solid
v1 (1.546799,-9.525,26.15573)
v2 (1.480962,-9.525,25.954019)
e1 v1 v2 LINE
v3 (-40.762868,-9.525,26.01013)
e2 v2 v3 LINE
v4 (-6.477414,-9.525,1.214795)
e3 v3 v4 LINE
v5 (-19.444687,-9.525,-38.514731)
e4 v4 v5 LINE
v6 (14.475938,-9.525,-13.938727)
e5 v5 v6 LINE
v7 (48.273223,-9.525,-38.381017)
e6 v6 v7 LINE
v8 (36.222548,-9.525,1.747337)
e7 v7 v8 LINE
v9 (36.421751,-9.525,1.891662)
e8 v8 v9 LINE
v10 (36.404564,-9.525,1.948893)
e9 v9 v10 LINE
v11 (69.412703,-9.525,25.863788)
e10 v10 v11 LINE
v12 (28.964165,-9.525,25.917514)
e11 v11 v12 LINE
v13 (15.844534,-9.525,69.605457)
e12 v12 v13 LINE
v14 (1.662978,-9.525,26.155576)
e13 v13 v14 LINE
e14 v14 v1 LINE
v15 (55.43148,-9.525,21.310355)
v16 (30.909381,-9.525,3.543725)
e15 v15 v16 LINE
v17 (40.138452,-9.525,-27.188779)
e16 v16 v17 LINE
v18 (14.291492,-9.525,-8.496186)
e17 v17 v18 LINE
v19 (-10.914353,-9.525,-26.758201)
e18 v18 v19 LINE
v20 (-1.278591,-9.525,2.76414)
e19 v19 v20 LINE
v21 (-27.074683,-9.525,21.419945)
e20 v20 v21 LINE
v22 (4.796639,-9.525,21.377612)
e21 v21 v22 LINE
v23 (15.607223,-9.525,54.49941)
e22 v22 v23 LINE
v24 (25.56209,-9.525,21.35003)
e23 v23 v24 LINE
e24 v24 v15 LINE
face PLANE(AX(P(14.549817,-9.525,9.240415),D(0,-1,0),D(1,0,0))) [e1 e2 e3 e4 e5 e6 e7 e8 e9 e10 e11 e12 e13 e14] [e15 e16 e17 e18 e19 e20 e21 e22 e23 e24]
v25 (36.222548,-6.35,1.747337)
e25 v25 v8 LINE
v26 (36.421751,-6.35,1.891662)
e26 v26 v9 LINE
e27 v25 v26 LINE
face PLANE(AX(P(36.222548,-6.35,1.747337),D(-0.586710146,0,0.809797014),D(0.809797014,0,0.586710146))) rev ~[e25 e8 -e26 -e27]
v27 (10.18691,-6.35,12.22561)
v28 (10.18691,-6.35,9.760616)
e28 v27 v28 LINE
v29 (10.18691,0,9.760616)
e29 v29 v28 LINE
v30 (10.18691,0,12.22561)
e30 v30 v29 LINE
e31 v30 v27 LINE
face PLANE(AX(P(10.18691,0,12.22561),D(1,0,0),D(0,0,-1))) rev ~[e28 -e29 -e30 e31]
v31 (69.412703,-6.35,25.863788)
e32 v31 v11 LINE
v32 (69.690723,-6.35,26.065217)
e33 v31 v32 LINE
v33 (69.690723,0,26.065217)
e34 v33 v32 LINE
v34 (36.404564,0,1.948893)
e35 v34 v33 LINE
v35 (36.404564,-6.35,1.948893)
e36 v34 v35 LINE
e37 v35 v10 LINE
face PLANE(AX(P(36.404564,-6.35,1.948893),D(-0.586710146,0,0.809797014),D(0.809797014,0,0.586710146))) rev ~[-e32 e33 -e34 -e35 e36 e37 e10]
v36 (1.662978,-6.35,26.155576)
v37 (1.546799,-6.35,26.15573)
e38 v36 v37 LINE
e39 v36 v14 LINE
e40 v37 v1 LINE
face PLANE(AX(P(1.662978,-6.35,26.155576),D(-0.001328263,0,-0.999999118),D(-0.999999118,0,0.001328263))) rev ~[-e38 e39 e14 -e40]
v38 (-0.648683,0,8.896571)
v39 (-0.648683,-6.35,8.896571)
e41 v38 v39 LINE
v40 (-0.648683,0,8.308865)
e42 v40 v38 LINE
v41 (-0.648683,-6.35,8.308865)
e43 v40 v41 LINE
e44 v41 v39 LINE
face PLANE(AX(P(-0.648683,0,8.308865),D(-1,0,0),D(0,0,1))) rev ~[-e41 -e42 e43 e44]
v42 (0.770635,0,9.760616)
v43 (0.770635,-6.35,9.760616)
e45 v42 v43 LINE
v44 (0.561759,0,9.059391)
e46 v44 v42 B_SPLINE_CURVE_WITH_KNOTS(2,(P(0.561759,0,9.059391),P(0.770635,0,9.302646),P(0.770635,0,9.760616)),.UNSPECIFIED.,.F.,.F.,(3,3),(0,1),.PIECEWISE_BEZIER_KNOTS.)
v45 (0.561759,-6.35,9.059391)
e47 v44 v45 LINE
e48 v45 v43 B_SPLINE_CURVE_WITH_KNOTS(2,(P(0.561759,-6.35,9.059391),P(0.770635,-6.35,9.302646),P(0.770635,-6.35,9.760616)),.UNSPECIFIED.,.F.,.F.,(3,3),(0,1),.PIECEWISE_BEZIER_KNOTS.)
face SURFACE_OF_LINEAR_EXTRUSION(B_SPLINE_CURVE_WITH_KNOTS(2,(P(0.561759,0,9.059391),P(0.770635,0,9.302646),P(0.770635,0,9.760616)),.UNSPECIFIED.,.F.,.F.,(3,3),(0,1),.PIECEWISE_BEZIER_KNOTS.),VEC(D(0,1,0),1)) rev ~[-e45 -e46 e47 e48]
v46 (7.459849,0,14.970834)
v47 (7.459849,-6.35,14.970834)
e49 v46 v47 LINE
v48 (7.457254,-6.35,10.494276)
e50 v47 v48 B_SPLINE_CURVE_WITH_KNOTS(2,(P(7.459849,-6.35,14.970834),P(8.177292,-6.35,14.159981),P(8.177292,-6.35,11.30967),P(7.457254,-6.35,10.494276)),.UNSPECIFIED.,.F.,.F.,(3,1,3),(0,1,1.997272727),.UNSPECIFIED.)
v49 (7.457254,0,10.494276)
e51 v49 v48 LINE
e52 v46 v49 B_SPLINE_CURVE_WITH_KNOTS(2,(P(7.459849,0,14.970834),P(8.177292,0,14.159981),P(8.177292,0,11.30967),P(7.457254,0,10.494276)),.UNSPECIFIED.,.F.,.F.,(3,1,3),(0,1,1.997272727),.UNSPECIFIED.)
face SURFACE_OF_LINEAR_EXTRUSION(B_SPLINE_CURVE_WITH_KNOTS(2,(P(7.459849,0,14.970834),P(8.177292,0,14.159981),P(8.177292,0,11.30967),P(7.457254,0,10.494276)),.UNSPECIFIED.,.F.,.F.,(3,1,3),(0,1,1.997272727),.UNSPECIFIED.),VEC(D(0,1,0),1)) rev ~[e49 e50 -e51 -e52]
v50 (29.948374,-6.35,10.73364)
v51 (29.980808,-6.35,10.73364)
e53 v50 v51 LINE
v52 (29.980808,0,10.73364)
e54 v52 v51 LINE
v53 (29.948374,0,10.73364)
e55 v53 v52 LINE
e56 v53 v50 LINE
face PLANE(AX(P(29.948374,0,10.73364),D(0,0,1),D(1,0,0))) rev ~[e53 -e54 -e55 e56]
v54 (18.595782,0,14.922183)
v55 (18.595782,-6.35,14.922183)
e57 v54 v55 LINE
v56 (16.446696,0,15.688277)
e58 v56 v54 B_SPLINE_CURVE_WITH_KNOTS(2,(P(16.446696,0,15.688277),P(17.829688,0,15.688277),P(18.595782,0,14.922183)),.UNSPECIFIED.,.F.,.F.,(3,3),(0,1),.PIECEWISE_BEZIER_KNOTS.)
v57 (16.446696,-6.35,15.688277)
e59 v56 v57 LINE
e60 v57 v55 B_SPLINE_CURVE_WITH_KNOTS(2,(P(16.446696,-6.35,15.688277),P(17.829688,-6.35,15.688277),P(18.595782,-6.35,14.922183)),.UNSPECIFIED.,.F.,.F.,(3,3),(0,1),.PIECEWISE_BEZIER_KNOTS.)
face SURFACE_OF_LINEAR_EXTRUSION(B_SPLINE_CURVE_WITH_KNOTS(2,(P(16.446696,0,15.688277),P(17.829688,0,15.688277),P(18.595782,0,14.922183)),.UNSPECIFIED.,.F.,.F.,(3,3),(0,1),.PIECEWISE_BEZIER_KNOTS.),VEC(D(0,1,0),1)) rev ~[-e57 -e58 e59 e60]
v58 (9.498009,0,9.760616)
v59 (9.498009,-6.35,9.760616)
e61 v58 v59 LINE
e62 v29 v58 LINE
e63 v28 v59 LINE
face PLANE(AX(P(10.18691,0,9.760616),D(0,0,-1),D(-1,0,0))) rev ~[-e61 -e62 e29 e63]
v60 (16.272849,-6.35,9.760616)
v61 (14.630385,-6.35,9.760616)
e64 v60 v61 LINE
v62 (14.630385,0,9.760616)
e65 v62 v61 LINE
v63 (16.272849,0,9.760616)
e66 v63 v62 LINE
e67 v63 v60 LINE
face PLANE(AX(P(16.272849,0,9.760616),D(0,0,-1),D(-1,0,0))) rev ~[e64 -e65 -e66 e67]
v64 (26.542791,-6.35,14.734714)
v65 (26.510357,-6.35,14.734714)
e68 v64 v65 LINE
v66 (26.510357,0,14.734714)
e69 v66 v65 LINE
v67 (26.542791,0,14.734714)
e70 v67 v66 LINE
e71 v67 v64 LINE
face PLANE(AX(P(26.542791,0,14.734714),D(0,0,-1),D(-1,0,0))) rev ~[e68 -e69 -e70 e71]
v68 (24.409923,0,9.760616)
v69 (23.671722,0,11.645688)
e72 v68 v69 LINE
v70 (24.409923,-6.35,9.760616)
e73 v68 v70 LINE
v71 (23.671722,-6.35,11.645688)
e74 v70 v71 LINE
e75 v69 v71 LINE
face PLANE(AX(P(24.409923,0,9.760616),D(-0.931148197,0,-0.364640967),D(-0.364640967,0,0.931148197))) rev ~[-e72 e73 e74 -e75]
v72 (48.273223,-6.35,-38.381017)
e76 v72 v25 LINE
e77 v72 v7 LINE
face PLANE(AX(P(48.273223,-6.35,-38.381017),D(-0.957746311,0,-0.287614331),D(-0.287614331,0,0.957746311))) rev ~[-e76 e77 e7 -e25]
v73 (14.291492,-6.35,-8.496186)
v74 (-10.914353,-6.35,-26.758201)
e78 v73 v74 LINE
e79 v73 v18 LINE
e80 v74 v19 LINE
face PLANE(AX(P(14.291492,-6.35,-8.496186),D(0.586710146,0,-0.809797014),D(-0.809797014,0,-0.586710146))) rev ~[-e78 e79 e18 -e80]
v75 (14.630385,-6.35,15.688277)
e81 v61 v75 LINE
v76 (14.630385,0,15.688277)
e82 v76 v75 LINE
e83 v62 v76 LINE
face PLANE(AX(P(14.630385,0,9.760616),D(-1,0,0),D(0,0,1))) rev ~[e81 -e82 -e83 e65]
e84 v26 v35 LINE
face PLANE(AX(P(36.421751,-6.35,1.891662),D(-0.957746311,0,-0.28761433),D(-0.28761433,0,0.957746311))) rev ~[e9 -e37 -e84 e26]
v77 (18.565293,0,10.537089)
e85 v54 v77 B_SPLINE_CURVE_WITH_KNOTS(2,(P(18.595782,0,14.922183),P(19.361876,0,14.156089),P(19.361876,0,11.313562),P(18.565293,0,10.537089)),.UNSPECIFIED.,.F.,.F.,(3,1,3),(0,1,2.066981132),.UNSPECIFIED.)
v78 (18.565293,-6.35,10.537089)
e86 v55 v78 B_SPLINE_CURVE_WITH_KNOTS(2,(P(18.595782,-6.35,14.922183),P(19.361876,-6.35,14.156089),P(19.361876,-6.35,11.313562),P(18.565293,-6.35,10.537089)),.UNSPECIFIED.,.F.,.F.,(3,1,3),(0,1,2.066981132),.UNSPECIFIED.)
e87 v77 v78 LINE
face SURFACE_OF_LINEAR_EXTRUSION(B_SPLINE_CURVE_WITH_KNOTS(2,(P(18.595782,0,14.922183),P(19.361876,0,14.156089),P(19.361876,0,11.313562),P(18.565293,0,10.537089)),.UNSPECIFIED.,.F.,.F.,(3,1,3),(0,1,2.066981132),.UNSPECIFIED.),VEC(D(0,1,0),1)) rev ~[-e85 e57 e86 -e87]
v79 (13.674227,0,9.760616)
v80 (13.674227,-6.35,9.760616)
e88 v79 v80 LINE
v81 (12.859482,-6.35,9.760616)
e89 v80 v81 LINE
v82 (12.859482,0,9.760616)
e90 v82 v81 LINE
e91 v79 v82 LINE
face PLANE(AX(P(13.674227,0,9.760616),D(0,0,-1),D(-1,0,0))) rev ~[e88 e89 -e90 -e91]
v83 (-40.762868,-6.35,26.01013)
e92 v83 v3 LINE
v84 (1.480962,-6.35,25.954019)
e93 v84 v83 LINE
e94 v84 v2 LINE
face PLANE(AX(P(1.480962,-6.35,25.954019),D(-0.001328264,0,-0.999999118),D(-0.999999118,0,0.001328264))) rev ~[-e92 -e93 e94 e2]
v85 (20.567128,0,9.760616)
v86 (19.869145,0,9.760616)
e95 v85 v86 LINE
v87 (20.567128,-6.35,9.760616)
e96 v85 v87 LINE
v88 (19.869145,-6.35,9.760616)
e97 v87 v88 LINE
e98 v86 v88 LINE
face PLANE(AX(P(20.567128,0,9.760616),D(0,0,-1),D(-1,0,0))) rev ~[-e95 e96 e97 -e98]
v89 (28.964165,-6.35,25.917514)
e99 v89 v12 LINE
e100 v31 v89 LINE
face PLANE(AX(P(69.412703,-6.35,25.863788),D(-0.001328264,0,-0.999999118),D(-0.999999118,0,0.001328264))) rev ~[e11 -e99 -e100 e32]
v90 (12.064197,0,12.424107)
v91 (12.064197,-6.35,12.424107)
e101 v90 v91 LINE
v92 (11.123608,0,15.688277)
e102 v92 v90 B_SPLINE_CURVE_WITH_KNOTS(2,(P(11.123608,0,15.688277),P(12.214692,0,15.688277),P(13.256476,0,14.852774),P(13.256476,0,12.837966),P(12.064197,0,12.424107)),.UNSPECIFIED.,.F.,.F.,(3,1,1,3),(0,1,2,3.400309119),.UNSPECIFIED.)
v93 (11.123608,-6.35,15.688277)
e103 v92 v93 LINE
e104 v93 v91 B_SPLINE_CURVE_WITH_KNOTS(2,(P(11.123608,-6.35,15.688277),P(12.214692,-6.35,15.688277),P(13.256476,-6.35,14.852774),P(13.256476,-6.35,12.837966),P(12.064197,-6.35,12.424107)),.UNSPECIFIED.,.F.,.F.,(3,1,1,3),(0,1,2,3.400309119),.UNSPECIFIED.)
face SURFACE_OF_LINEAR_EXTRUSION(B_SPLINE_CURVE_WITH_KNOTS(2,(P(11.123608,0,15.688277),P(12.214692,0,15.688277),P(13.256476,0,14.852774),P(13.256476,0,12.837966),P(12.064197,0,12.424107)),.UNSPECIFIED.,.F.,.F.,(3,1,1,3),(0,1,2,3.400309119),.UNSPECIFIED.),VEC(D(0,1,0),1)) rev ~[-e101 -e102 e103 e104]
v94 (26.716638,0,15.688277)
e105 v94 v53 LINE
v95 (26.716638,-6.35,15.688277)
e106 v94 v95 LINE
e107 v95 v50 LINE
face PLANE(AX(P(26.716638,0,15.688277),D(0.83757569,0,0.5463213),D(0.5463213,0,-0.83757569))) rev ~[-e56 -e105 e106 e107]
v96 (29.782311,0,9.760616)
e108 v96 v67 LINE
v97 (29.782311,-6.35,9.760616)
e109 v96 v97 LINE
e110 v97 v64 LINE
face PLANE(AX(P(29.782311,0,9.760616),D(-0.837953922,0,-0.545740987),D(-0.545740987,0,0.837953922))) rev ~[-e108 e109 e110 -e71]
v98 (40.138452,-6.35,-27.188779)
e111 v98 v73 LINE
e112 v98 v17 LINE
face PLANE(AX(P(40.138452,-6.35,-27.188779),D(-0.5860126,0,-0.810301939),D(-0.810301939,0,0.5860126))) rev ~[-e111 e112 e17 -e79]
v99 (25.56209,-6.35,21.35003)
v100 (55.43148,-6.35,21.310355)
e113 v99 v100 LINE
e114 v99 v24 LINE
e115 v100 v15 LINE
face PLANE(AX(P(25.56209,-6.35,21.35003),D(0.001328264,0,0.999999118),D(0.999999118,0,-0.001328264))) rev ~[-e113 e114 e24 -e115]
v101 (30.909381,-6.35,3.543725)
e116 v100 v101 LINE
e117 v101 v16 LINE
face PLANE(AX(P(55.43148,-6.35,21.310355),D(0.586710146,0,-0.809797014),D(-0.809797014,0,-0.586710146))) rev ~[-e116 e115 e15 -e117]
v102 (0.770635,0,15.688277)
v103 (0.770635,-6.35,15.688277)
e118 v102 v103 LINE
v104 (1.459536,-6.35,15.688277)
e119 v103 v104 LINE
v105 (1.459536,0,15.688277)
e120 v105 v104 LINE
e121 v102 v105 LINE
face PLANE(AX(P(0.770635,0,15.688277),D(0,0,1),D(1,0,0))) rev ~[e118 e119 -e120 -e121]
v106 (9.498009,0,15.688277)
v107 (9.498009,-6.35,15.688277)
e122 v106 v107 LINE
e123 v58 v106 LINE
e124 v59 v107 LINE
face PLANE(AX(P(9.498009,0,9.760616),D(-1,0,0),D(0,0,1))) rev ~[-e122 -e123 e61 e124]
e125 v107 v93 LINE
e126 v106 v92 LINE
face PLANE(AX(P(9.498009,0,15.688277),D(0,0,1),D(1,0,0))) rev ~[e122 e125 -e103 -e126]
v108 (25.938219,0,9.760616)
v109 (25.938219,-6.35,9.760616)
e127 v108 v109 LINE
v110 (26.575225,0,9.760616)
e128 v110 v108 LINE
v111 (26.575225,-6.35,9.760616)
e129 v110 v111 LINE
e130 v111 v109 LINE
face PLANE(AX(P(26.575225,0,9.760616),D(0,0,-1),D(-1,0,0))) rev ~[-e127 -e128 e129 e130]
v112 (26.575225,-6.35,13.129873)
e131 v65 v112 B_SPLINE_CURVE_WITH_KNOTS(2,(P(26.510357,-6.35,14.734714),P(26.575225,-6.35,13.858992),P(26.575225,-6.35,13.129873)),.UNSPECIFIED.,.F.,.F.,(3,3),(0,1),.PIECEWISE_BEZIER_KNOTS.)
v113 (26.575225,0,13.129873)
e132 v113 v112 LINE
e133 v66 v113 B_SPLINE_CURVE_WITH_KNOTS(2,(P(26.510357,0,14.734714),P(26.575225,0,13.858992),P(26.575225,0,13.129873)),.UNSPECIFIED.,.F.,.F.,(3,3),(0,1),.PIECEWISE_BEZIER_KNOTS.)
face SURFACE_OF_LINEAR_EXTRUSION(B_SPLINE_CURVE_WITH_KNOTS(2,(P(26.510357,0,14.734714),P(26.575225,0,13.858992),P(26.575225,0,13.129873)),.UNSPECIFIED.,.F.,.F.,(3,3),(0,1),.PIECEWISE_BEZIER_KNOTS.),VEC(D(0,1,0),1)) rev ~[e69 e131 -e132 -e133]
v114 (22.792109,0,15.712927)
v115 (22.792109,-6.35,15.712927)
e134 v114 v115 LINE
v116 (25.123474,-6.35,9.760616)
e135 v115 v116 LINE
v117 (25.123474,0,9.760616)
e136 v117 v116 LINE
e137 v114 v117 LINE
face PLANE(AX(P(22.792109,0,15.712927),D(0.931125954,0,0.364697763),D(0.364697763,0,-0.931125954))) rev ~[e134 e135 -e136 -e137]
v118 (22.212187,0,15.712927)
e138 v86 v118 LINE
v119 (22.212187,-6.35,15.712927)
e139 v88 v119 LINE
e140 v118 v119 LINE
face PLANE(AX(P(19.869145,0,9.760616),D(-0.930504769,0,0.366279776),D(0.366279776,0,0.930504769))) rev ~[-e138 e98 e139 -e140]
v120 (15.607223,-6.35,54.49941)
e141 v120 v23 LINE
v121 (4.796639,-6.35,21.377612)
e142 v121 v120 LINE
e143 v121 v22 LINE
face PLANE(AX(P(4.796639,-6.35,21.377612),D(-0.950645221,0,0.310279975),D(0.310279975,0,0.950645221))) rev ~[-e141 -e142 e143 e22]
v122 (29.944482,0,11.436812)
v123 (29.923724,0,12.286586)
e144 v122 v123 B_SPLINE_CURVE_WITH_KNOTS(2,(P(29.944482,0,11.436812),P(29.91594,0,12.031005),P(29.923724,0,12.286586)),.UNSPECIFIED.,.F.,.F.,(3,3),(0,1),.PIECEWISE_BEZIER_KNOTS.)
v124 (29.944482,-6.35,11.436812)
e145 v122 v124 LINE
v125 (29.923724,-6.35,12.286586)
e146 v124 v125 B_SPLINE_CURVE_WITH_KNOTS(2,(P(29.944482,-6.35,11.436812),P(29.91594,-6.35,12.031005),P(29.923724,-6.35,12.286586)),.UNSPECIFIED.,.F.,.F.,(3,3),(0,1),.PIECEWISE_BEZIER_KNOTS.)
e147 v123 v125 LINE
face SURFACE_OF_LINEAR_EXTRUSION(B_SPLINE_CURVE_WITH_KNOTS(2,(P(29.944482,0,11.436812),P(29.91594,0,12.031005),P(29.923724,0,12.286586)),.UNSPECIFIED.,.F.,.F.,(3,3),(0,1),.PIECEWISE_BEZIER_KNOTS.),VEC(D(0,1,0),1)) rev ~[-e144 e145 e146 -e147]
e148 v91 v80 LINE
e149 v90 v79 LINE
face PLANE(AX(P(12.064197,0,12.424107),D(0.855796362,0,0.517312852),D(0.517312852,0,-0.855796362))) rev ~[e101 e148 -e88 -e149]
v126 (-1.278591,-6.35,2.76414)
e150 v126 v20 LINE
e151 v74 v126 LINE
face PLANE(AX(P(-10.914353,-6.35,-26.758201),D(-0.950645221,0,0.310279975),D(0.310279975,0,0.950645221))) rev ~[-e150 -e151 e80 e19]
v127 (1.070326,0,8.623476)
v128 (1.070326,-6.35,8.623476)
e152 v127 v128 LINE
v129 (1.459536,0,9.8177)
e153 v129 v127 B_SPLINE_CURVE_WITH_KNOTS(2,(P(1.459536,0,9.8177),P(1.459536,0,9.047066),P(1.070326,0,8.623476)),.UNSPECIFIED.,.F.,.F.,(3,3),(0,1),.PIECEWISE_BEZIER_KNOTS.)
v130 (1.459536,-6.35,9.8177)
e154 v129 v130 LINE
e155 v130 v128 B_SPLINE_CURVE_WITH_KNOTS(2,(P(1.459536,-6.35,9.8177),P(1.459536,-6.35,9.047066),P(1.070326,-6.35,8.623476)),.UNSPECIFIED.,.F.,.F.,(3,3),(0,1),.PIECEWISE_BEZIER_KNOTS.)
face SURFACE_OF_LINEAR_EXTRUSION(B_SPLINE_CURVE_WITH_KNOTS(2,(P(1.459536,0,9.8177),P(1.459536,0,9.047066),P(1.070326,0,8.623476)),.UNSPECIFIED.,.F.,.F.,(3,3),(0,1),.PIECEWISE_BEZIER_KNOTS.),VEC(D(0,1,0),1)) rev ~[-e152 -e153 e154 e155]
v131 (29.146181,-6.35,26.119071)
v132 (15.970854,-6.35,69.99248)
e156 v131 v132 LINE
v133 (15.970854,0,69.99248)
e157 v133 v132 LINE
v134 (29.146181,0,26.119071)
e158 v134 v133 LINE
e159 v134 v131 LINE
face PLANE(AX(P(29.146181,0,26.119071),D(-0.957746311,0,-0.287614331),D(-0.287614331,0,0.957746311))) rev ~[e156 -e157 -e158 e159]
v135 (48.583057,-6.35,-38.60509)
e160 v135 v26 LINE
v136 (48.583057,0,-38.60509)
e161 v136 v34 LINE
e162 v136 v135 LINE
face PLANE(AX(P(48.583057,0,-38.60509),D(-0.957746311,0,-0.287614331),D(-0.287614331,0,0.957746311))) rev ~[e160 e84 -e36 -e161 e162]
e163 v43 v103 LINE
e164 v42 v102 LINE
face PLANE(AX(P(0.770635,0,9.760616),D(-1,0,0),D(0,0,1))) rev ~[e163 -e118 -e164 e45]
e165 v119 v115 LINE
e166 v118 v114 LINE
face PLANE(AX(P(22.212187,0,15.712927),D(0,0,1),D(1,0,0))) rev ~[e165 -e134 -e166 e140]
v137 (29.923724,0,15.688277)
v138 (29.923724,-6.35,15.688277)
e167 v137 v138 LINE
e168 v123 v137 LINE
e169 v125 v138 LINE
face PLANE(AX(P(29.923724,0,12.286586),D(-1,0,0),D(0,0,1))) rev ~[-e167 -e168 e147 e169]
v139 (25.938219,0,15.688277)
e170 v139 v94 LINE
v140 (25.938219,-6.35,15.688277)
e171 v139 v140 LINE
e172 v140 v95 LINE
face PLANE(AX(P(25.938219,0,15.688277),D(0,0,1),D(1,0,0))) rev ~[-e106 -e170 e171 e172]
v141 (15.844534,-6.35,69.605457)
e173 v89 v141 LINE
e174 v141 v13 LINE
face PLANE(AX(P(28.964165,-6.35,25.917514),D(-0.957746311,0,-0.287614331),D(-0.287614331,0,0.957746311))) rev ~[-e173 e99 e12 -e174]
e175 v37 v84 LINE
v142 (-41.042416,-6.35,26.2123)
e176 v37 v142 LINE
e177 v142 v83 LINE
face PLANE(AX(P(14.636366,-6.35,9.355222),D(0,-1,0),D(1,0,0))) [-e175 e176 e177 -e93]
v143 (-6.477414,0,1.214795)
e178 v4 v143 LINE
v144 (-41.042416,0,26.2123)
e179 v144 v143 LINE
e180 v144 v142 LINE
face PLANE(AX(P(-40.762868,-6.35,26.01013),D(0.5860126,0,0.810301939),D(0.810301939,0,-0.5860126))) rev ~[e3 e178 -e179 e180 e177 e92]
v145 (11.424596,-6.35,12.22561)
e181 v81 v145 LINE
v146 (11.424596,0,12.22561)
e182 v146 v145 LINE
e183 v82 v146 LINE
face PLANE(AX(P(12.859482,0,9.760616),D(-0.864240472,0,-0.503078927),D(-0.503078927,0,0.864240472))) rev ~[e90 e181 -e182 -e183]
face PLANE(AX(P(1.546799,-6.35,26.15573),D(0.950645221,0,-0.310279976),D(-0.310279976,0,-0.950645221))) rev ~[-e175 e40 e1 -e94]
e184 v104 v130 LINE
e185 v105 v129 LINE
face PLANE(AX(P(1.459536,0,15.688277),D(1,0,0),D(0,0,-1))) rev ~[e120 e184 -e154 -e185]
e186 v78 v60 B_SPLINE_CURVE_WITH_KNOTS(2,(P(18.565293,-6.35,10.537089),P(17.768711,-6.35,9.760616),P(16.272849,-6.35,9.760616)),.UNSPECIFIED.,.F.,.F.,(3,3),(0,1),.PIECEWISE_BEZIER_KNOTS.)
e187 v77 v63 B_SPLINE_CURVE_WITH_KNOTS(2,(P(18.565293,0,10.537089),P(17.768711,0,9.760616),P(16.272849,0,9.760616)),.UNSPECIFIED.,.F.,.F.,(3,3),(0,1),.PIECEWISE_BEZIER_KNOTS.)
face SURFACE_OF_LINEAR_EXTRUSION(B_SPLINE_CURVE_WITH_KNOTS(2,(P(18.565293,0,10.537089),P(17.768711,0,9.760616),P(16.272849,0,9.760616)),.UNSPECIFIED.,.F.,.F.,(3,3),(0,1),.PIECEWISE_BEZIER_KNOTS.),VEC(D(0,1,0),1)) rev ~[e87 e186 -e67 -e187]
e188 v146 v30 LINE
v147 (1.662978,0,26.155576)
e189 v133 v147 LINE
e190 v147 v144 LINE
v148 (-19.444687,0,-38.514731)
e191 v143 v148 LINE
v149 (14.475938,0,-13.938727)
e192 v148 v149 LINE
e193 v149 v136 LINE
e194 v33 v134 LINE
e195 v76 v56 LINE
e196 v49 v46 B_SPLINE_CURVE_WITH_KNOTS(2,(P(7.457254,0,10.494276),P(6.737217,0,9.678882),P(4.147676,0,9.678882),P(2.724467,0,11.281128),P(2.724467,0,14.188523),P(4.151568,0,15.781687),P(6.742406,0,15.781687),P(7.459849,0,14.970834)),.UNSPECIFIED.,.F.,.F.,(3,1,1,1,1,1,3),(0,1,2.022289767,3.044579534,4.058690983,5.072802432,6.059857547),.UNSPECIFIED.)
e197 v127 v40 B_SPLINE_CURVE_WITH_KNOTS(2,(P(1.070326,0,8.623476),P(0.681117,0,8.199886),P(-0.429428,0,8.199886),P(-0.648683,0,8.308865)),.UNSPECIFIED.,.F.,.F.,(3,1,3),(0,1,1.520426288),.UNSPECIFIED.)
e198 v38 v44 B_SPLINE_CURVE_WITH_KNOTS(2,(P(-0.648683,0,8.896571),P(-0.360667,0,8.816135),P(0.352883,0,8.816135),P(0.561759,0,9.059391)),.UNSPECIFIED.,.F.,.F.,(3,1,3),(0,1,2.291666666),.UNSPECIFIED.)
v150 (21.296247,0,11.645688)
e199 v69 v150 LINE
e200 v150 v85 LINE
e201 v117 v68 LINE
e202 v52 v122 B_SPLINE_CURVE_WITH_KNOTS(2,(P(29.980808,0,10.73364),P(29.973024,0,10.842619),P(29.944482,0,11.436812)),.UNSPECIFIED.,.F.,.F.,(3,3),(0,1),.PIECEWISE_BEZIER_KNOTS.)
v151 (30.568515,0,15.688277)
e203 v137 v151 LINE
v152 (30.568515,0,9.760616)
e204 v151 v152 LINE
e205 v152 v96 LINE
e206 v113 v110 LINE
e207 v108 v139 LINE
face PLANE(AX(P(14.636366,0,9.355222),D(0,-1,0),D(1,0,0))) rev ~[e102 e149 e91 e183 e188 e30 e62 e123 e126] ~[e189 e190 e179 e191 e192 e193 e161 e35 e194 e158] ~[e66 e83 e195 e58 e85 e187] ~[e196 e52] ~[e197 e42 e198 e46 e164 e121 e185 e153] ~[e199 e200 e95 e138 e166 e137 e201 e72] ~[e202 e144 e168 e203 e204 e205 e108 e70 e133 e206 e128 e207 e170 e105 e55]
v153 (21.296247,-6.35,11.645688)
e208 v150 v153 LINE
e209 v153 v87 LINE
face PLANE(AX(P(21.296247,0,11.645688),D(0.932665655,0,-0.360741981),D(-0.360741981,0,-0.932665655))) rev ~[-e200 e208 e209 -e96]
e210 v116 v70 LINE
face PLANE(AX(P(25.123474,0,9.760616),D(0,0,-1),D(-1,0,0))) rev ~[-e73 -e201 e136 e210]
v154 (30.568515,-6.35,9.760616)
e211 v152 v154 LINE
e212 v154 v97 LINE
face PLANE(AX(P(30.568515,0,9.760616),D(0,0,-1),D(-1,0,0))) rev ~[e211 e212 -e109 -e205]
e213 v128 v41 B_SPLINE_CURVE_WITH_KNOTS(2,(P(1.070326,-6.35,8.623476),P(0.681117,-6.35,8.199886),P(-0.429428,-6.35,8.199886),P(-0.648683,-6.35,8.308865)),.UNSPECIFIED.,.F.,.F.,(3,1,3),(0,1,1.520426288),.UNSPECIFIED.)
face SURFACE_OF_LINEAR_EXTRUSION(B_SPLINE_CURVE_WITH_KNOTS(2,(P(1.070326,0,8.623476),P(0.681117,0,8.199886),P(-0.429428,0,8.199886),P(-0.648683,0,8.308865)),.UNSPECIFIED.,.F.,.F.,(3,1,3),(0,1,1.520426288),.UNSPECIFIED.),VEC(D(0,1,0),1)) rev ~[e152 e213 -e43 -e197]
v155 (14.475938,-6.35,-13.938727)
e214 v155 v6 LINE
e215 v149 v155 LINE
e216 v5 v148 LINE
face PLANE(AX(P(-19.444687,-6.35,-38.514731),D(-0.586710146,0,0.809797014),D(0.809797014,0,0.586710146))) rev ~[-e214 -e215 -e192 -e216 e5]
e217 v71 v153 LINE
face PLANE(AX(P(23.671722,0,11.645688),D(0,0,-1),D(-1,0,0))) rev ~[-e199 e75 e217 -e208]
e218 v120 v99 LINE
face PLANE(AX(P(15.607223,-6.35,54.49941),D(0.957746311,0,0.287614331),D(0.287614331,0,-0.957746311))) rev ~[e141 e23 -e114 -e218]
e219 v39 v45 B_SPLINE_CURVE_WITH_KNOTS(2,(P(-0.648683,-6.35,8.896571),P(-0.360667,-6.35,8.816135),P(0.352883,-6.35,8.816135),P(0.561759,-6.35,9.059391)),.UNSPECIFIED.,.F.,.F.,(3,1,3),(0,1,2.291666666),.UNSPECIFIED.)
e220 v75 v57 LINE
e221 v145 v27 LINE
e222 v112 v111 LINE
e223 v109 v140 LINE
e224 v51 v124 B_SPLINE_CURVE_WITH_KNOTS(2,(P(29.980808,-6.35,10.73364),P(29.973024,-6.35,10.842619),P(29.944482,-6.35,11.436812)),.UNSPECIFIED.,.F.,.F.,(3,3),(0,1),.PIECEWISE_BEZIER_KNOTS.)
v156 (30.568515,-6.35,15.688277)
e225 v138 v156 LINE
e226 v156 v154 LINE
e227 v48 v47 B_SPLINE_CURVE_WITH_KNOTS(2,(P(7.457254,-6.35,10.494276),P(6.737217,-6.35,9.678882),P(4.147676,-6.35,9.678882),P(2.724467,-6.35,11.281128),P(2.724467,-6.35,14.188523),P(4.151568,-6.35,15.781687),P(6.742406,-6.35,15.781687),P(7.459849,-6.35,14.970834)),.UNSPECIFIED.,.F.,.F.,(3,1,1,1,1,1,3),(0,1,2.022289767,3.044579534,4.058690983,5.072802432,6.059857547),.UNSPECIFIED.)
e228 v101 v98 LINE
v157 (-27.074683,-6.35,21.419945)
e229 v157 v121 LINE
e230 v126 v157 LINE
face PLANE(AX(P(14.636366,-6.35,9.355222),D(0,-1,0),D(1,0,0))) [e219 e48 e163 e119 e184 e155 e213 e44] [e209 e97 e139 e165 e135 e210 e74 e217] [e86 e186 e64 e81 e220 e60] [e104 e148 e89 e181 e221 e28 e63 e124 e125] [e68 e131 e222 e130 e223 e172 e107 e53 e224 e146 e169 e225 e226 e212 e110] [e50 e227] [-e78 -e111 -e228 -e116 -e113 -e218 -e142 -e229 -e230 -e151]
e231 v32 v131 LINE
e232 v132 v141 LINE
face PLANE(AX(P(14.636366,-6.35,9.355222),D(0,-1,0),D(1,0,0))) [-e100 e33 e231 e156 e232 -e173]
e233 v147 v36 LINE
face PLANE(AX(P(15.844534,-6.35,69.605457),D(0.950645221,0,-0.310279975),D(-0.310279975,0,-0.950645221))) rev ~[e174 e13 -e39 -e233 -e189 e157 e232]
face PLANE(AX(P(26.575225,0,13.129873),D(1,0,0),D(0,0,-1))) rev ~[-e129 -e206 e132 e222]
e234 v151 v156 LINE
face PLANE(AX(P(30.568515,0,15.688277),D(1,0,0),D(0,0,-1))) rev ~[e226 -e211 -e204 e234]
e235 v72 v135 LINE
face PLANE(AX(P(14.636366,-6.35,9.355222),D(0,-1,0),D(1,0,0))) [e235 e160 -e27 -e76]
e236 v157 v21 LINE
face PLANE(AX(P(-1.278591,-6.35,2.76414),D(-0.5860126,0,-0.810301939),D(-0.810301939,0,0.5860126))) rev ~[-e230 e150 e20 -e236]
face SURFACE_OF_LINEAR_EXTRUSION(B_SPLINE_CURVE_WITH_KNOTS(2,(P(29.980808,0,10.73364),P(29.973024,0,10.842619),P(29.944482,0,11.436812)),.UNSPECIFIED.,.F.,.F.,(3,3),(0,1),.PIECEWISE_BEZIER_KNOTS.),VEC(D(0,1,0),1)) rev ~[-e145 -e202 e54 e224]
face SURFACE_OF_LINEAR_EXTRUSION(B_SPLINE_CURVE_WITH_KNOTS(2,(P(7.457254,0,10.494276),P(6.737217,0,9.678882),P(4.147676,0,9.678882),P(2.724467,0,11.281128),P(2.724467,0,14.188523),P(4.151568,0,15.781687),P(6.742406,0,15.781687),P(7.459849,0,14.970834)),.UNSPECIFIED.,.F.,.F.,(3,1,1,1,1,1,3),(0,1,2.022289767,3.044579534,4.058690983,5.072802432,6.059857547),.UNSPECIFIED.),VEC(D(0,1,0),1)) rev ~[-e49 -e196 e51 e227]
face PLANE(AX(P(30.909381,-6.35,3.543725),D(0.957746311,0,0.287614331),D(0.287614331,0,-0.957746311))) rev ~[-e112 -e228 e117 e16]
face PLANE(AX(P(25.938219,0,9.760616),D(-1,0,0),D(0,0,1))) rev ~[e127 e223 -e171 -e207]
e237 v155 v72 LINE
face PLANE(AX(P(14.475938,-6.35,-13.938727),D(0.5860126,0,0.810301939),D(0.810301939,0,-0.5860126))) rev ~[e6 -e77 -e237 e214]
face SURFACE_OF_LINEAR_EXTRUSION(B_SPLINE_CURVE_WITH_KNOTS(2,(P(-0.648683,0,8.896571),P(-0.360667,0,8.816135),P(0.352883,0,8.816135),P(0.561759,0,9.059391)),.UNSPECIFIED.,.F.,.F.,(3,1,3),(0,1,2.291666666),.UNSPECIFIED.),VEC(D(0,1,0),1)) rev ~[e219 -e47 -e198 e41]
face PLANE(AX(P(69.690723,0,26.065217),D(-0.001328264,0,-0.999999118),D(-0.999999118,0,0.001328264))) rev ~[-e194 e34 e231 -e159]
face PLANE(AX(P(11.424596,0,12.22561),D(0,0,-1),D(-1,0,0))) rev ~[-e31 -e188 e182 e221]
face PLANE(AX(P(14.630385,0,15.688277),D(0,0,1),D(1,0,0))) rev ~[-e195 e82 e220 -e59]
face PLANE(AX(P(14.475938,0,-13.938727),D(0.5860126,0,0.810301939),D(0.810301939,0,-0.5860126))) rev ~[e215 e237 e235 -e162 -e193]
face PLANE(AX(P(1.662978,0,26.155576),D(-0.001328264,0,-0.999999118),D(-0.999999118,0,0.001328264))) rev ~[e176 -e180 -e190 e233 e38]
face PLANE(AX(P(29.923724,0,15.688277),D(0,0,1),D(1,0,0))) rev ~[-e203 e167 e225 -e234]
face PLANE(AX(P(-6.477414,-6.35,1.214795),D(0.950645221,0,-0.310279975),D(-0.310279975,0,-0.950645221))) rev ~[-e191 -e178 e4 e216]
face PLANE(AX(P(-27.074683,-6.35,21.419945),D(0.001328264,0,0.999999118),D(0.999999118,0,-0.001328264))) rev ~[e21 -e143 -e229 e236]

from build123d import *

# Parameters (mm, degrees)
F1_DEPTH = 6.35
F3_DEPTH = 3.175


with BuildPart() as f1:
    # F0 (on Front) → F1 (new body)
    with BuildSketch(Plane.XZ):
        Polygon((36.4045640823, 1.9488933967), (69.6907226001, 26.065217087), (29.1461811696, 26.1190709712), (15.9708538221, 69.9924798862), (1.6629783111, 26.15557594), (-41.0424164863, 26.2123000095), (-6.4774139305, 1.2147947246), (-19.4446871391, -38.5147311336), (14.4759376997, -13.9387270281), (48.5830571498, -38.6050899867), align=None)
        with BuildLine():
            add(Edge.make_bspline(
                [(1.0703261445, 8.6234759039), (0.6811166374, 8.1998862237), (-0.0492998709, 8.1998862237)],
                knots=[0, 0, 0, 1, 1, 1], degree=2))
            add(Edge.make_bspline(
                [(-0.0492998709, 8.1998862237), (-0.4294278228, 8.1998862237), (-0.6486825118, 8.3088648857)],
                knots=[0, 0, 0, 1, 1, 1], degree=2))
            Line((-0.6486825118, 8.3088648857), (-0.6486825118, 8.8965712414))
            add(Edge.make_bspline(
                [(-0.6486825118, 8.8965712414), (-0.3606674766, 8.81613461), (-0.0492998709, 8.81613461)],
                knots=[0, 0, 0, 1, 1, 1], degree=2))
            add(Edge.make_bspline(
                [(-0.0492998709, 8.81613461), (0.3528832864, 8.81613461), (0.5617590552, 9.0593905519)],
                knots=[0, 0, 0, 1, 1, 1], degree=2))
            add(Edge.make_bspline(
                [(0.5617590552, 9.0593905519), (0.7706348241, 9.3026464938), (0.7706348241, 9.7606163472)],
                knots=[0, 0, 0, 1, 1, 1], degree=2))
            Line((0.7706348241, 9.7606163472), (0.7706348241, 15.6882771403))
            Line((0.7706348241, 15.6882771403), (1.4595356516, 15.6882771403))
            Line((1.4595356516, 15.6882771403), (1.4595356516, 9.8177004082))
            add(Edge.make_bspline(
                [(1.4595356516, 9.8177004082), (1.4595356516, 9.0470655842), (1.0703261445, 8.6234759039)],
                knots=[0, 0, 0, 1, 1, 1], degree=2))
        make_face(mode=Mode.SUBTRACT)
        with BuildLine():
            add(Edge.make_bspline(
                [(7.4598488861, 14.9708342823), (8.1772917442, 14.1599811425), (8.1772917442, 12.7328796164)],
                knots=[0, 0, 0, 1, 1, 1], degree=2))
            add(Edge.make_bspline(
                [(8.1772917442, 12.7328796164), (8.1772917442, 11.3096701855), (7.4572541561, 10.4942762681)],
                knots=[0, 0, 0, 1, 1, 1], degree=2))
            add(Edge.make_bspline(
                [(7.4572541561, 10.4942762681), (6.7372165679, 9.6788823507), (5.4567172896, 9.6788823507)],
                knots=[0, 0, 0, 1, 1, 1], degree=2))
            add(Edge.make_bspline(
                [(5.4567172896, 9.6788823507), (4.1476759807, 9.6788823507), (3.4360712652, 10.4800052528)],
                knots=[0, 0, 0, 1, 1, 1], degree=2))
            add(Edge.make_bspline(
                [(3.4360712652, 10.4800052528), (2.7244665497, 11.2811281549), (2.7244665497, 12.7406638066)],
                knots=[0, 0, 0, 1, 1, 1], degree=2))
            add(Edge.make_bspline(
                [(2.7244665497, 12.7406638066), (2.7244665497, 14.188523173), (3.4380173127, 14.9851052975)],
                knots=[0, 0, 0, 1, 1, 1], degree=2))
            add(Edge.make_bspline(
                [(3.4380173127, 14.9851052975), (4.1515680757, 15.781687422), (5.4645014797, 15.781687422)],
                knots=[0, 0, 0, 1, 1, 1], degree=2))
            add(Edge.make_bspline(
                [(5.4645014797, 15.781687422), (6.742406028, 15.781687422), (7.4598488861, 14.9708342823)],
                knots=[0, 0, 0, 1, 1, 1], degree=2))
        make_face(mode=Mode.SUBTRACT)
        with BuildLine():
            Line((11.4245963984, 12.2256098922), (10.1869101659, 12.2256098922))
            Line((10.1869101659, 12.2256098922), (10.1869101659, 9.7606163472))
            Line((10.1869101659, 9.7606163472), (9.4980093383, 9.7606163472))
            Line((9.4980093383, 9.7606163472), (9.4980093383, 15.6882771403))
            Line((9.4980093383, 15.6882771403), (11.1236077129, 15.6882771403))
            add(Edge.make_bspline(
                [(11.1236077129, 15.6882771403), (12.2146916979, 15.6882771403), (12.7355837549, 15.2705256027)],
                knots=[0, 0, 0, 1, 1, 1], degree=2))
            add(Edge.make_bspline(
                [(12.7355837549, 15.2705256027), (13.2564758119, 14.8527740651), (13.2564758119, 14.0133788948)],
                knots=[0, 0, 0, 1, 1, 1], degree=2))
            add(Edge.make_bspline(
                [(13.2564758119, 14.0133788948), (13.2564758119, 12.8379661833), (12.0641973551, 12.4241067408)],
                knots=[0, 0, 0, 1, 1, 1], degree=2))
            Line((12.0641973551, 12.4241067408), (13.6742273495, 9.7606163472))
            Line((13.6742273495, 9.7606163472), (12.8594821146, 9.7606163472))
            Line((12.8594821146, 9.7606163472), (11.4245963984, 12.2256098922))
        make_face(mode=Mode.SUBTRACT)
        with BuildLine():
            add(Edge.make_bspline(
                [(18.5957815668, 14.9221830939), (19.3618756133, 14.1560890474), (19.3618756133, 12.7808821223)],
                knots=[0, 0, 0, 1, 1, 1], degree=2))
            add(Edge.make_bspline(
                [(19.3618756133, 12.7808821223), (19.3618756133, 11.3135622805), (18.5652934887, 10.5370893139)],
                knots=[0, 0, 0, 1, 1, 1], degree=2))
            add(Edge.make_bspline(
                [(18.5652934887, 10.5370893139), (17.7687113642, 9.7606163472), (16.2728494919, 9.7606163472)],
                knots=[0, 0, 0, 1, 1, 1], degree=2))
            Line((16.2728494919, 9.7606163472), (14.6303853719, 9.7606163472))
            Line((14.6303853719, 9.7606163472), (14.6303853719, 15.6882771403))
            Line((14.6303853719, 15.6882771403), (16.4466964051, 15.6882771403))
            add(Edge.make_bspline(
                [(16.4466964051, 15.6882771403), (17.8296875203, 15.6882771403), (18.5957815668, 14.9221830939)],
                knots=[0, 0, 0, 1, 1, 1], degree=2))
        make_face(mode=Mode.SUBTRACT)
        Polygon((25.1234736834, 9.7606163472), (24.4099229204, 9.7606163472), (23.6717222219, 11.6456877266), (21.2962468635, 11.6456877266), (20.5671277202, 9.7606163472), (19.8691453375, 9.7606163472), (22.2121865703, 15.7129270758), (22.7921087358, 15.7129270758), align=None, mode=Mode.SUBTRACT)
        with BuildLine():
            Line((30.5685146877, 15.6882771403), (30.5685146877, 9.7606163472))
            Line((30.5685146877, 9.7606163472), (29.7823114834, 9.7606163472))
            Line((29.7823114834, 9.7606163472), (26.5427910193, 14.7347138479))
            Line((26.5427910193, 14.7347138479), (26.5103568937, 14.7347138479))
            add(Edge.make_bspline(
                [(26.5103568937, 14.7347138479), (26.5752251449, 13.858992457), (26.5752251449, 13.1298733137)],
                knots=[0, 0, 0, 1, 1, 1], degree=2))
            Line((26.5752251449, 13.1298733137), (26.5752251449, 9.7606163472))
            Line((26.5752251449, 9.7606163472), (25.9382189182, 9.7606163472))
            Line((25.9382189182, 9.7606163472), (25.9382189182, 15.6882771403))
            Line((25.9382189182, 15.6882771403), (26.7166379324, 15.6882771403))
            Line((26.7166379324, 15.6882771403), (29.9483742064, 10.7336401149))
            Line((29.9483742064, 10.7336401149), (29.980808332, 10.7336401149))
            add(Edge.make_bspline(
                [(29.980808332, 10.7336401149), (29.9730241418, 10.8426187769), (29.9444821113, 11.4368119578)],
                knots=[0, 0, 0, 1, 1, 1], degree=2))
            add(Edge.make_bspline(
                [(29.9444821113, 11.4368119578), (29.9159400808, 12.0310051386), (29.9237242709, 12.2865860483)],
                knots=[0, 0, 0, 1, 1, 1], degree=2))
            Line((29.9237242709, 12.2865860483), (29.9237242709, 15.6882771403))
            Line((29.9237242709, 15.6882771403), (30.5685146877, 15.6882771403))
        make_face(mode=Mode.SUBTRACT)
    extrude(amount=F1_DEPTH)

    # F2 (on face) → F3 (join)
    with BuildSketch(Plane.XZ.offset(6.35)):
        Polygon((36.4045640823, 1.9488933967), (69.4127031084, 25.8637877737), (28.9641653483, 25.9175141396), (15.8445339726, 69.6054572911), (1.6629783111, 26.15557594), (1.5467987544, 26.1557302572), (1.4809624898, 25.9540191084), (-40.7628684516, 26.0101300989), (-6.4774139305, 1.2147947246), (-19.4446871391, -38.5147311336), (14.4759376997, -13.9387270281), (48.2732234246, -38.3810173811), (36.222548261, 1.7473365651), (36.421750894, 1.891661876), align=None)
        Polygon((55.4314800111, 21.3103554065), (30.9093811696, 3.5437250843), (40.1384522175, -27.1887794914), (14.2914917683, -8.4961863292), (-10.9143527112, -26.7582006747), (-1.2785905938, 2.7641402252), (-27.0746829363, 21.4199454322), (4.7966385236, 21.3776118802), (15.6072232815, 54.4994101005), (25.5620899488, 21.3500298636), align=None, mode=Mode.SUBTRACT)
    extrude(amount=F3_DEPTH)


solid = f1.part
